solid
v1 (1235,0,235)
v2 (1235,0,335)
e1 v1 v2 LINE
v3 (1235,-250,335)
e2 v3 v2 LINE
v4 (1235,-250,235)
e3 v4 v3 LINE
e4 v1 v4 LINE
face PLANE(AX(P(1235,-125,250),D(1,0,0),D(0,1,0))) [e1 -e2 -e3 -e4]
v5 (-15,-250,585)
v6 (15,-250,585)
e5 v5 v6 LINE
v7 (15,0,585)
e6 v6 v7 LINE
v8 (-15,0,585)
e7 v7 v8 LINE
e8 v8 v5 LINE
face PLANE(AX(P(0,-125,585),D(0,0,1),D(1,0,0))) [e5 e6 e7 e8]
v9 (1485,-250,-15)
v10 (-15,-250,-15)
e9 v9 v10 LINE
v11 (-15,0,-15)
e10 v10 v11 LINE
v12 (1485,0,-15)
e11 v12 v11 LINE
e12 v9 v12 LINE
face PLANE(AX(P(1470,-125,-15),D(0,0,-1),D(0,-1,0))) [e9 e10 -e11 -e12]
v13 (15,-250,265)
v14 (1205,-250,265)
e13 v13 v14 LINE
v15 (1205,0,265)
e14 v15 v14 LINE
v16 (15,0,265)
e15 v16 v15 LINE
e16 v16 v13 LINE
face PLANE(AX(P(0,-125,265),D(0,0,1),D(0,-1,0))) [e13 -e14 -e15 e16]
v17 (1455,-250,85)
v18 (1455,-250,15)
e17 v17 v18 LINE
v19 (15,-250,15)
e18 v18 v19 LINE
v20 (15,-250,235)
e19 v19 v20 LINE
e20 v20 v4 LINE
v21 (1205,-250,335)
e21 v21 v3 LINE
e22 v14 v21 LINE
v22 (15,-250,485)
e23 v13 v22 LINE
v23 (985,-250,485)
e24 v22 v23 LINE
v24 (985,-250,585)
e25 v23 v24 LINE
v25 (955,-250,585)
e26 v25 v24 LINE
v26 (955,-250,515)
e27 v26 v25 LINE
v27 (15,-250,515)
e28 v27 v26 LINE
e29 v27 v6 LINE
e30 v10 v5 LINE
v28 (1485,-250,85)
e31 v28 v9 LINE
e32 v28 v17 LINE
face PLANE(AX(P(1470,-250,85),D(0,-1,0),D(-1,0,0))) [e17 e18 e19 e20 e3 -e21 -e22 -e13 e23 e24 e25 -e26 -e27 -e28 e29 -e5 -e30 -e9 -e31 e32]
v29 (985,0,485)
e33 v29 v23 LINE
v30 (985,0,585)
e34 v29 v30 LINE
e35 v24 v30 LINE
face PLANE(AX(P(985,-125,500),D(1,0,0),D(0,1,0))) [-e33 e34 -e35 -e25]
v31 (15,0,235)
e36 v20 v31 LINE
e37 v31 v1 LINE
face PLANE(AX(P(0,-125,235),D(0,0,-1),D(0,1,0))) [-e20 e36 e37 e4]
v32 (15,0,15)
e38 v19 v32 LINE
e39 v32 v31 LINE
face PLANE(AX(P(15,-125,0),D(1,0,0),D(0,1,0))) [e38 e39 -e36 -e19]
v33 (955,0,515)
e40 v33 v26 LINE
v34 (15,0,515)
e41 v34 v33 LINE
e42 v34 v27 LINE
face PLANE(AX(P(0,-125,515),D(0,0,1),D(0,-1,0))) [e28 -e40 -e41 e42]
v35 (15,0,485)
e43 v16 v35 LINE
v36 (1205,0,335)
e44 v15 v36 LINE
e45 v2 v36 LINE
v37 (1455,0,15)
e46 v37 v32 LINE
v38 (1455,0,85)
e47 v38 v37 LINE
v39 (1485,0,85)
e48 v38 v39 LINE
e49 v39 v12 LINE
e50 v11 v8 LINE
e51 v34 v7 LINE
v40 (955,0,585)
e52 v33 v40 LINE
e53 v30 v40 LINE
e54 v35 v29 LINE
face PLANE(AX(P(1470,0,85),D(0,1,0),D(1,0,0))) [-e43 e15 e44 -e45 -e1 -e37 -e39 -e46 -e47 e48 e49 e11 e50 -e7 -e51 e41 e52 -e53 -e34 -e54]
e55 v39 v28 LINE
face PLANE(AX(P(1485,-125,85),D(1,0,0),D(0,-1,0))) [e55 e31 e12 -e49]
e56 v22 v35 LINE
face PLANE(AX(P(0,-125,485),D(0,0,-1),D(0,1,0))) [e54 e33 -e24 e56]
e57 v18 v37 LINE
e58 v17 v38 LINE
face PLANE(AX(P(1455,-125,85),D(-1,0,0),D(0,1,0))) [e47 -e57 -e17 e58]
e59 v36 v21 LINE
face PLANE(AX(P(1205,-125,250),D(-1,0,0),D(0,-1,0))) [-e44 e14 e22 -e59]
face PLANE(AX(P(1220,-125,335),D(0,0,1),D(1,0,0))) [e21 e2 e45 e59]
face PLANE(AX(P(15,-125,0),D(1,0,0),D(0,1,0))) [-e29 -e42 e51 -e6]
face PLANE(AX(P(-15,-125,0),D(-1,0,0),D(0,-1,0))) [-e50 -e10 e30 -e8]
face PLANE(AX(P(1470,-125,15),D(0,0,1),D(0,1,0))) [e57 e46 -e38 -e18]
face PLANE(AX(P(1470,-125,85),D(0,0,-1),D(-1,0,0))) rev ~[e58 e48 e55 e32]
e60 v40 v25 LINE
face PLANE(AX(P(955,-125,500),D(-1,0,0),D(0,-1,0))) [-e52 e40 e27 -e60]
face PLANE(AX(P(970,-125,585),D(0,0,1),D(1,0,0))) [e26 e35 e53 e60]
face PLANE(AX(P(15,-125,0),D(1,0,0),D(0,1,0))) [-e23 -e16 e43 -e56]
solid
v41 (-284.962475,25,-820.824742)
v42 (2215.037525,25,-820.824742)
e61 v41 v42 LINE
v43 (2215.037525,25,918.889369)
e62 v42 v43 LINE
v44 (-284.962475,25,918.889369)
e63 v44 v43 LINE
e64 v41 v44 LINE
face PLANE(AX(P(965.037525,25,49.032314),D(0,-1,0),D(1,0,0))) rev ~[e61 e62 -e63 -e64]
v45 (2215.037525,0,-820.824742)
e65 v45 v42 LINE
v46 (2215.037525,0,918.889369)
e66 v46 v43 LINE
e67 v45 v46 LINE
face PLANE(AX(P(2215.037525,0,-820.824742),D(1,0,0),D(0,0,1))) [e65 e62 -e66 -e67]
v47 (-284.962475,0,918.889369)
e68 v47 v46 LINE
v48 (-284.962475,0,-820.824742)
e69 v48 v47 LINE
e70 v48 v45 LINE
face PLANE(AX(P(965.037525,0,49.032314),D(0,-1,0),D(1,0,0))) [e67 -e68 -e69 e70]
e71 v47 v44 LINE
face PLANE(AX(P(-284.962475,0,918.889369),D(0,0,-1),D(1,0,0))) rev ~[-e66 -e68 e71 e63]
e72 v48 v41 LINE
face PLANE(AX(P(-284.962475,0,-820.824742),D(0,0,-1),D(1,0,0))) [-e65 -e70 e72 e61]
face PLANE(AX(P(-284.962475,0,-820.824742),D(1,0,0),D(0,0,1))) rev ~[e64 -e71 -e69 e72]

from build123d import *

# Parameters (mm, degrees)
F0_W     = 2500
F0_H     = 1739.7141116797
F1_DEPTH = 25
F3_W     = 30
F3_H     = 250


with BuildPart() as f1:
    # F0 (on Front) → F1 (new body)
    with BuildSketch(Plane.XZ):
        with Locations((965.0375247002, 49.0323135227)):
            Rectangle(F0_W, F0_H)
    extrude(amount=-F1_DEPTH)


with BuildPart() as f4:
    # F4: sweep along a path in F2
    with BuildLine(Plane.XZ) as f4_path:
        Line((1470, 85), (1470, 0))
        Line((1470, 0), (0, 0))
        Line((0, 0), (0, 250))
        Line((0, 250), (0, 500))
        Line((0, 500), (0, 585))
    # F3 (on Top) → F4 (sweep)
    with BuildSketch(Plane.XY):
        with Locations((0, -125)):
            Rectangle(F3_W, F3_H)
    sweep(path=f4_path.line, transition=Transition.RIGHT)

    # F5: sweep along a path in F2
    with BuildLine(Plane.XZ) as f5_path:
        Line((0, 0), (0, 250))
        Line((0, 250), (1220, 250))
        Line((1220, 250), (1220, 335))
    # F3 (on Top) → F5 (sweep)
    with BuildSketch(Plane.XY):
        with Locations((0, -125)):
            Rectangle(F3_W, F3_H)
    sweep(path=f5_path.line, transition=Transition.RIGHT)

    # F6: sweep along a path in F2
    with BuildLine(Plane.XZ) as f6_path:
        Line((0, 0), (0, 250))
        Line((0, 250), (0, 500))
        Line((0, 500), (970, 500))
        Line((970, 500), (970, 585))
    # F3 (on Top) → F6 (sweep)
    with BuildSketch(Plane.XY):
        with Locations((0, -125)):
            Rectangle(F3_W, F3_H)
    sweep(path=f6_path.line, transition=Transition.RIGHT)


solid = Compound([f1.part, f4.part])
